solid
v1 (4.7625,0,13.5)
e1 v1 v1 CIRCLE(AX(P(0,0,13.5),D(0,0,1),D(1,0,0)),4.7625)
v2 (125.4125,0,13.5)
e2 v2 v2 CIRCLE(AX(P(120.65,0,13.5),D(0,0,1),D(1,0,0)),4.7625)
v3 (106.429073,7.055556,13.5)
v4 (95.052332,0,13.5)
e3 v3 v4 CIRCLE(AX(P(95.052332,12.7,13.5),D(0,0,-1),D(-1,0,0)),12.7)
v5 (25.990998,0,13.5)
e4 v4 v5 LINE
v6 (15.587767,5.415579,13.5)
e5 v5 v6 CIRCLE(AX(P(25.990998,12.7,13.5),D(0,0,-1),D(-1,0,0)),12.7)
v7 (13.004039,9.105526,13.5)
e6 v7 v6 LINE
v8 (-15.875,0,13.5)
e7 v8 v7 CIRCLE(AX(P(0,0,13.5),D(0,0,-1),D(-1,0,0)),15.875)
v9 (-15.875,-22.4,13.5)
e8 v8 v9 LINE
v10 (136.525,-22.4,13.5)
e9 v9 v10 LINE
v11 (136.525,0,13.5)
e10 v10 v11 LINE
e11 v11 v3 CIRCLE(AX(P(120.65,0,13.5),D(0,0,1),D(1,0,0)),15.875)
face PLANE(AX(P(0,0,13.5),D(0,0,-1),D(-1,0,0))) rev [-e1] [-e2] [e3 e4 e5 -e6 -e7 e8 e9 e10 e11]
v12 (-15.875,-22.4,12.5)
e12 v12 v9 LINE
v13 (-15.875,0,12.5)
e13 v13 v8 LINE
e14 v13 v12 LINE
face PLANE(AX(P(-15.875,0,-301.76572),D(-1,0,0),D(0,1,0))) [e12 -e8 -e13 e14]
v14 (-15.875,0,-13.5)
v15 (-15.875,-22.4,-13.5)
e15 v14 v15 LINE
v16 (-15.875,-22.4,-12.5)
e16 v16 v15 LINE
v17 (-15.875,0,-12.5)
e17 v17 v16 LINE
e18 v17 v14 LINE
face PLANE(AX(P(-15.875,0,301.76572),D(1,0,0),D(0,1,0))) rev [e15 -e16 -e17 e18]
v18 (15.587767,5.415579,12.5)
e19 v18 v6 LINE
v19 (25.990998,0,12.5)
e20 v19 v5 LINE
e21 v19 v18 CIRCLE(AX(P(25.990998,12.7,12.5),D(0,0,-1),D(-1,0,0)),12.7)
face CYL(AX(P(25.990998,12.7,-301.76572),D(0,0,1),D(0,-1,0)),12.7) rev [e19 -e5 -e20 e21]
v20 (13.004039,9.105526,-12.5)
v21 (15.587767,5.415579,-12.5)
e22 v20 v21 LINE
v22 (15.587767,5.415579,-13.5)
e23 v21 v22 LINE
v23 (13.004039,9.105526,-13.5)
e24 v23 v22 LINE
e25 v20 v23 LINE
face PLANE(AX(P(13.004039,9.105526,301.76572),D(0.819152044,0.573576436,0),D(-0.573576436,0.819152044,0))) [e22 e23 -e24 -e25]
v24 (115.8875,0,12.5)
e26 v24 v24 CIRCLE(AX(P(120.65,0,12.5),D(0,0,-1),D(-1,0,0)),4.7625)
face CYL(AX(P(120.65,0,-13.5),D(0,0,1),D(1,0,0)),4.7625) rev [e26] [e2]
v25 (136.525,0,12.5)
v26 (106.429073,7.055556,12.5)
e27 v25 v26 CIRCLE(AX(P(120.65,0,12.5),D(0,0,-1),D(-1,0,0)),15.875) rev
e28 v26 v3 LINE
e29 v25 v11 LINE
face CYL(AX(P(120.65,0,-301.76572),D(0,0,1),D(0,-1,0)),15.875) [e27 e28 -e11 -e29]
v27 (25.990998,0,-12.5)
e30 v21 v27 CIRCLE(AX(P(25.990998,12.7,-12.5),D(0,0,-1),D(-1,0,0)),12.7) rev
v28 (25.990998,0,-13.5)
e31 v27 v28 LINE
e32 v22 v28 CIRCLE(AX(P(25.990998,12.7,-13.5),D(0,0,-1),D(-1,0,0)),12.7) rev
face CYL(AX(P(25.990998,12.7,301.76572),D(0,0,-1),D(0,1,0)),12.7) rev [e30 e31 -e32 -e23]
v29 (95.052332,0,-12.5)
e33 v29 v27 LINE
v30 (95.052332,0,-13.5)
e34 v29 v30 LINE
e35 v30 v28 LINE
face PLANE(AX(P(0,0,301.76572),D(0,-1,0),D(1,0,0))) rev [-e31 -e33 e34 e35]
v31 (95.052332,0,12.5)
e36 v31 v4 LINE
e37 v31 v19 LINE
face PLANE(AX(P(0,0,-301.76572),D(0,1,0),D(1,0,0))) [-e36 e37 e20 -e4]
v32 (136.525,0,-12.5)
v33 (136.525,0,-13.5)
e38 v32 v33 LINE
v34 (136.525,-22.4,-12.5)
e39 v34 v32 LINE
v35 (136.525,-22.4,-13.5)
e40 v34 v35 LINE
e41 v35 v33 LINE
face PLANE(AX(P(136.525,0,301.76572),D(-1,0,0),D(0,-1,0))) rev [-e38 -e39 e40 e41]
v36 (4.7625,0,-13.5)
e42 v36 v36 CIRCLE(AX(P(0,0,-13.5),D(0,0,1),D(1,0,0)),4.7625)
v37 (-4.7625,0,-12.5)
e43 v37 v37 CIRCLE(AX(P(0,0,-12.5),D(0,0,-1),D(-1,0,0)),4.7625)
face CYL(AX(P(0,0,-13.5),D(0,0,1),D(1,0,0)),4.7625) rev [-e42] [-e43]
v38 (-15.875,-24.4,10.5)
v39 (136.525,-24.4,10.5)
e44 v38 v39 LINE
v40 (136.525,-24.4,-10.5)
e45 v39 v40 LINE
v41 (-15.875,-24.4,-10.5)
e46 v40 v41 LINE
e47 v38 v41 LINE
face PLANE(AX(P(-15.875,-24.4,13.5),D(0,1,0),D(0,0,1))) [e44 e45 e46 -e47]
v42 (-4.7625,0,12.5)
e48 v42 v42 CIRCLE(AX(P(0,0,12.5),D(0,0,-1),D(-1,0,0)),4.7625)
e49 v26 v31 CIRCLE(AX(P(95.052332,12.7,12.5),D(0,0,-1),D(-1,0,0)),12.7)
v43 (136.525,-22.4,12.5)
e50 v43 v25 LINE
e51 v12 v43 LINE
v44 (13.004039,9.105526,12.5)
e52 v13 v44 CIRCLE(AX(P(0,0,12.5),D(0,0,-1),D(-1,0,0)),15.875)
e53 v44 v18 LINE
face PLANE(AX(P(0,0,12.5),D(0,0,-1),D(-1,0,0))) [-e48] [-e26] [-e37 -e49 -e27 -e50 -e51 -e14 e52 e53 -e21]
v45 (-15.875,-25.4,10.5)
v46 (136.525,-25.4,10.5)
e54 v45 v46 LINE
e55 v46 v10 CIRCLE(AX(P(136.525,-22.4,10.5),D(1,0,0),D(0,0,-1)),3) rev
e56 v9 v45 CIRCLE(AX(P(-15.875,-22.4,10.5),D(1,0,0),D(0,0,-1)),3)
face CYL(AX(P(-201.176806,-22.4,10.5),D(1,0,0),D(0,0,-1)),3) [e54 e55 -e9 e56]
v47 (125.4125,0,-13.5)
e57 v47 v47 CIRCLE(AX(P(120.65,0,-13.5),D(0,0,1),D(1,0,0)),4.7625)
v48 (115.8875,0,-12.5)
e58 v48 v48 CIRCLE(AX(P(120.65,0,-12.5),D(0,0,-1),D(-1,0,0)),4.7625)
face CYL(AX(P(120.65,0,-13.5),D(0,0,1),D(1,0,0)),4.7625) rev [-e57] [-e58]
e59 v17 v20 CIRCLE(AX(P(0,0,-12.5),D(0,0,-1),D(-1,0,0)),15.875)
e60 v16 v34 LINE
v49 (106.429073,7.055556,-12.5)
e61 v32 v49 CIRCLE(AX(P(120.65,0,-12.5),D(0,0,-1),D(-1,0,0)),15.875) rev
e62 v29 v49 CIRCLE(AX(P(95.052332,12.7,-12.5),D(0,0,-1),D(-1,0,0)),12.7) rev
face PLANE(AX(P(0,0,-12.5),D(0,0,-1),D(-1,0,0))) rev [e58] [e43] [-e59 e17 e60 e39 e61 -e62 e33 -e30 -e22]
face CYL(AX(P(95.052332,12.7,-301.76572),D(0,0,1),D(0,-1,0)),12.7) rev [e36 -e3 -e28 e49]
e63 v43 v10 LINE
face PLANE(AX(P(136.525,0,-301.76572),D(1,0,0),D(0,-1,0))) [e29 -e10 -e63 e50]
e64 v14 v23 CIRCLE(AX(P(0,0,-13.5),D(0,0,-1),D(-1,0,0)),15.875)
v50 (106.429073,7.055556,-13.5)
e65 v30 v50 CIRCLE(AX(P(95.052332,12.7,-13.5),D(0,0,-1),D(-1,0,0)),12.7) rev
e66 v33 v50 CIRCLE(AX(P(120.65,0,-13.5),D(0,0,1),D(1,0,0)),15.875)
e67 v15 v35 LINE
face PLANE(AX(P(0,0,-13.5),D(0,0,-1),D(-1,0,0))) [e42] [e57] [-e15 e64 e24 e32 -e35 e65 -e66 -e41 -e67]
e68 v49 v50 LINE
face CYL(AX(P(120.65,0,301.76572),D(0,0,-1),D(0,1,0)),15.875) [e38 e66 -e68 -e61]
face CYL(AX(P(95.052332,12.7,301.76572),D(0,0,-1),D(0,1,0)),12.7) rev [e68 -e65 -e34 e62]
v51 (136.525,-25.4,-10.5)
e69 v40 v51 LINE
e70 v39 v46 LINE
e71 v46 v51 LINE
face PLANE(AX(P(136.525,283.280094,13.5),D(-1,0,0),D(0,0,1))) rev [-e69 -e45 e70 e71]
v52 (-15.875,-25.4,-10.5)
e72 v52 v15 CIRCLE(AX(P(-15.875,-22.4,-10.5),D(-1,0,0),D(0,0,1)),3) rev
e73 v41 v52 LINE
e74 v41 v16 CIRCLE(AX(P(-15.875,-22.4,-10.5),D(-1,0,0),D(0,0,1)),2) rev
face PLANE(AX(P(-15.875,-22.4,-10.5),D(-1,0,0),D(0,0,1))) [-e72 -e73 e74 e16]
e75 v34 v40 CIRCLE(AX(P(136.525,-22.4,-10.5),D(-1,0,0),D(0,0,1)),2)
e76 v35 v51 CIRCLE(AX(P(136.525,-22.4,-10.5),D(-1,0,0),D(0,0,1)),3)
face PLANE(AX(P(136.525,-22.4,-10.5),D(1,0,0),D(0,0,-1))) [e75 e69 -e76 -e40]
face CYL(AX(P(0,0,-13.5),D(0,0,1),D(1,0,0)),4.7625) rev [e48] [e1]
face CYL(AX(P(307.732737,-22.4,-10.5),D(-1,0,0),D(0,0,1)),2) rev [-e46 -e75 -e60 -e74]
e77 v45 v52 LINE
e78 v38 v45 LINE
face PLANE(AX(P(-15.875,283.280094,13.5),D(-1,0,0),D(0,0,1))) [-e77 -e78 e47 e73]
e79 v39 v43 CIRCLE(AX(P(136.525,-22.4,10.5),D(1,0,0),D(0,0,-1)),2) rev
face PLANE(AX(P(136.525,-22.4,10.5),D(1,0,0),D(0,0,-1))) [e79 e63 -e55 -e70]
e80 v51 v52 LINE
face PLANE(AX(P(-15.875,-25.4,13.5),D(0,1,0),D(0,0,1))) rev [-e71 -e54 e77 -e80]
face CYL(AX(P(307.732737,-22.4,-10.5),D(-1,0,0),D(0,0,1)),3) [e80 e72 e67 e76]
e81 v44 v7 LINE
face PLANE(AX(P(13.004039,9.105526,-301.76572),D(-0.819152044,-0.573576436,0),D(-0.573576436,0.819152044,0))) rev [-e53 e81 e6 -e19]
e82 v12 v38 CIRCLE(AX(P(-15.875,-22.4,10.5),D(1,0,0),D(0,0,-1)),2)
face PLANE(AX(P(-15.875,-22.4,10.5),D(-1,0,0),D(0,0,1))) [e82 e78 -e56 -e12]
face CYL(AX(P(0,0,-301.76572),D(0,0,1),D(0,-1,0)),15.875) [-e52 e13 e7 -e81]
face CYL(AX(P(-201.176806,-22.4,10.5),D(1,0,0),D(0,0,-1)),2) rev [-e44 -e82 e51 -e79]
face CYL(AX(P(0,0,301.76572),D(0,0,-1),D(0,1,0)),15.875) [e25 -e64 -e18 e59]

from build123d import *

# Parameters (mm, degrees)
BASE_EXTRUDE_DEPTH         = 13.5
FILLET1_R                  = 12.7
SHELL1_T                   = -1
SKETCH2_R                  = 4.7625
CUT_EXTRUDE1_DEPTH         = 142.468143499
FLATTEN_BENDS1_START       = -24.4
FLATTEN_BENDS1_OUTLINE_W   = 152.4
FLATTEN_BENDS1_OUTLINE_H   = 1
FLATTEN_BENDS1_DEPTH       = 41.4
FLATTEN_BENDS1_START_2     = -25.4
FLATTEN_BENDS1_2_OUTLINE_R = 4.7625
FLATTEN_BENDS1_2_DEPTH     = 1
PROCESS_BENDS1_START       = -54
PROCESS_BENDS1_OUTLINE_W   = 152.4
PROCESS_BENDS1_OUTLINE_H   = 1
PROCESS_BENDS1_DEPTH       = 40.80822
PROCESS_BENDS1_START_2     = 13.19178
PROCESS_BENDS1_2_OUTLINE_W = 152.4
PROCESS_BENDS1_2_OUTLINE_H = 1
PROCESS_BENDS1_2_DEPTH     = 40.80822
PROCESS_BENDS1_START_3     = -13.5
PROCESS_BENDS1_3_OUTLINE_R = 4.7625
PROCESS_BENDS1_3_DEPTH     = 3
PROCESS_BENDS1_START_4     = 10.5
PROCESS_BENDS1_4_OUTLINE_R = 4.7625
PROCESS_BENDS1_4_DEPTH     = 3
PROCESS_BENDS1_START_5     = -15.875
PROCESS_BENDS1_5_DEPTH     = 152.4


with BuildPart() as part:
    # Sketch1 → Base-Extrude (new, symmetric)
    with BuildSketch(Plane.XY):
        with BuildLine():
            Line((-15.875, 0), (-15.875, -25.4))
            Line((-15.875, -25.4), (136.525, -25.4))
            Line((136.525, -25.4), (136.525, 0))
            ThreePointArc((136.525, 0), (123.40666482, 15.633823079), (105.732379645, 5.429569775))
            Line((105.732379645, 5.429569775), (103.756177862, 0))
            Line((103.756177862, 0), (19.379796597, 0))
            Line((19.379796597, 0), (13.004038703, 9.105525927))
            ThreePointArc((13.004038703, 9.105525927), (-4.773704567, 15.140256593), (-15.875, 0))
        make_face()
    extrude(amount=BASE_EXTRUDE_DEPTH, both=True)

    # Fillet1
    # the kernel refuses this fillet: 12.7 mm, written as the material it adds along each edge
    with BuildSketch(Plane(origin=(103.756177862, 0, -13.5), x_dir=(-1, 0, 0), z_dir=(0, 0, 1))) as fillet1_piece_1:
        with BuildLine():
            CenterArc((8.703846213, -12.7), FILLET1_R, 90, 63.612200039)
            Line((-2.672895276, -7.055555556), (-3.810569425, -6.491111111))
            ThreePointArc((-3.810569425, -6.491111111), (-3.169611411, -4.995204193), (-1.193409628, 0.434365582))
            Line((-1.193409628, 0.434365582), (0, 1.27))
            Line((0, 1.27), (8.703846213, 1.27))
            Line((8.703846213, 1.27), (8.703846213, 0))
        make_face()
    extrude(amount=27)
    with BuildSketch(Plane(origin=(19.379796597, 0, 13.5), x_dir=(-0.5735764363510504, 0.8191520442889888, 0), z_dir=(0, 0, -1))) as fillet1_piece_2:
        with BuildLine():
            CenterArc((FILLET1_R * 0.520567050552, FILLET1_R), FILLET1_R, 215, 55)
            Line((-FILLET1_R * 0.298584993737, FILLET1_R * 0.426423563649), (0, 0))
            Line((0, 0), (FILLET1_R * 0.520567050552, 0))
        make_face()
    extrude(amount=27)

    # Shell1
    shell1_openings = [part.faces().sort_by_distance(p)[0] for p in [
        (-15.875, -12.7, 0),
        (136.525, -12.7, 0),
        (124.273424559, 15.45595094, 0),
        (60.521664894, 0, 0),
        (14.29590294, 7.260552593, 0),
        (-4.773704567, 15.140256593, 0),
        (20.126790751, 1.434962419, 0),
        (101.745819363, 1.907075363, 0),
    ]]
    offset(amount=SHELL1_T, openings=shell1_openings, kind=Kind.INTERSECTION)

    # Sketch2 → Cut-Extrude1 (cut, through all)
    with BuildSketch(Plane.XY.offset(13.5)):
        with Locations((120.65, 0)):
            Circle(SKETCH2_R)
        Circle(SKETCH2_R)
    extrude(amount=-CUT_EXTRUDE1_DEPTH, mode=Mode.SUBTRACT)

    # Flatten-Bends1: read off the stored shape, not the designer's step
    # Flatten-Bends1 outline → Flatten-Bends1 (cut)
    with BuildSketch(Plane(origin=(0, 0, 0), x_dir=(1, 0, 0), z_dir=(0, 1, 0)).offset(FLATTEN_BENDS1_START)):
        with Locations((60.325, 13)):
            Rectangle(FLATTEN_BENDS1_OUTLINE_W, FLATTEN_BENDS1_OUTLINE_H)
        with Locations((60.325, -13)):
            Rectangle(FLATTEN_BENDS1_OUTLINE_W, FLATTEN_BENDS1_OUTLINE_H)
    extrude(amount=FLATTEN_BENDS1_DEPTH, mode=Mode.SUBTRACT)

    # Flatten-Bends1 2 outline → Flatten-Bends1 2 (add)
    # profile 1 of 2: a face of its own
    with BuildSketch(Plane(origin=(0, 0, 0), x_dir=(1, 0, 0), z_dir=(0, 1, 0)).offset(FLATTEN_BENDS1_START_2)):
        with BuildLine():
            ThreePointArc((106.429073138, -43.882546373), (124.273424559, -52.282941757), (136.525, -36.826990817))
            Line((136.525, -36.826990817), (136.525, -13.5))
            Line((136.525, -13.5), (-15.875, -13.5))
            Line((-15.875, -13.5), (-15.875, -36.826990817))
            ThreePointArc((-15.875, -36.826990817), (-4.773704567, -51.96724741), (13.004038703, -45.932516744))
            Line((13.004038703, -45.932516744), (15.587767176, -42.242570075))
            ThreePointArc((15.587767176, -42.242570075), (20.126790751, -38.261953236), (25.990998139, -36.826990817))
            Line((25.990998139, -36.826990817), (95.052331649, -36.826990817))
            ThreePointArc((95.052331649, -36.826990817), (101.745819363, -38.73406618), (106.429073138, -43.882546373))
        make_face()
        with Locations((0, -36.826990817)):
            Circle(FLATTEN_BENDS1_2_OUTLINE_R, mode=Mode.SUBTRACT)
        with Locations((120.65, -36.826990817)):
            Circle(FLATTEN_BENDS1_2_OUTLINE_R, mode=Mode.SUBTRACT)
    # profile 2 of 2: a face of its own
    with BuildSketch(Plane(origin=(0, 0, 0), x_dir=(1, 0, 0), z_dir=(0, 1, 0)).offset(FLATTEN_BENDS1_START_2)):
        with BuildLine():
            Line((-15.875, 36.826990817), (-15.875, 13.5))
            Line((-15.875, 13.5), (136.525, 13.5))
            Line((136.525, 13.5), (136.525, 36.826990817))
            ThreePointArc((136.525, 36.826990817), (124.273424559, 52.282941757), (106.429073138, 43.882546373))
            ThreePointArc((106.429073138, 43.882546373), (101.745819363, 38.73406618), (95.052331649, 36.826990817))
            Line((95.052331649, 36.826990817), (25.990998139, 36.826990817))
            ThreePointArc((25.990998139, 36.826990817), (20.126790751, 38.261953236), (15.587767176, 42.242570075))
            Line((15.587767176, 42.242570075), (13.004038703, 45.932516744))
            ThreePointArc((13.004038703, 45.932516744), (-4.773704567, 51.96724741), (-15.875, 36.826990817))
        make_face()
        with Locations((0, 36.826990817)):
            Circle(FLATTEN_BENDS1_2_OUTLINE_R, mode=Mode.SUBTRACT)
        with Locations((120.65, 36.826990817)):
            Circle(FLATTEN_BENDS1_2_OUTLINE_R, mode=Mode.SUBTRACT)
    extrude(amount=FLATTEN_BENDS1_2_DEPTH)

    # Process-Bends1: read off the stored shape, not the designer's step
    # Process-Bends1 outline → Process-Bends1 (cut)
    with BuildSketch(Plane.XY.offset(PROCESS_BENDS1_START)):
        with Locations((60.325, -24.9)):
            Rectangle(PROCESS_BENDS1_OUTLINE_W, PROCESS_BENDS1_OUTLINE_H)
    extrude(amount=PROCESS_BENDS1_DEPTH, mode=Mode.SUBTRACT)

    # Process-Bends1 2 outline → Process-Bends1 2 (cut)
    with BuildSketch(Plane.XY.offset(PROCESS_BENDS1_START_2)):
        with Locations((60.325, -24.9)):
            Rectangle(PROCESS_BENDS1_2_OUTLINE_W, PROCESS_BENDS1_2_OUTLINE_H)
    extrude(amount=PROCESS_BENDS1_2_DEPTH, mode=Mode.SUBTRACT)

    # Process-Bends1 3 outline → Process-Bends1 3 (add)
    with BuildSketch(Plane.XY.offset(PROCESS_BENDS1_START_3)):
        with BuildLine():
            Line((136.525, -24.4), (136.525, 0))
            ThreePointArc((136.525, 0), (124.273424559, 15.45595094), (106.429073138, 7.055555556))
            ThreePointArc((106.429073138, 7.055555556), (101.745819363, 1.907075363), (95.052331649, 0))
            Line((95.052331649, 0), (25.990998139, 0))
            ThreePointArc((25.990998139, 0), (20.126790751, 1.434962419), (15.587767176, 5.415579258))
            Line((15.587767176, 5.415579258), (13.004038703, 9.105525927))
            ThreePointArc((13.004038703, 9.105525927), (-4.773704567, 15.140256593), (-15.875, 0))
            Line((-15.875, 0), (-15.875, -24.4))
            Line((-15.875, -24.4), (136.525, -24.4))
        make_face()
        Circle(PROCESS_BENDS1_3_OUTLINE_R, mode=Mode.SUBTRACT)
        with Locations((120.65, 0)):
            Circle(PROCESS_BENDS1_3_OUTLINE_R, mode=Mode.SUBTRACT)
    extrude(amount=PROCESS_BENDS1_3_DEPTH)

    # Process-Bends1 4 outline → Process-Bends1 4 (add)
    with BuildSketch(Plane.XY.offset(PROCESS_BENDS1_START_4)):
        with BuildLine():
            Line((136.525, -24.4), (136.525, 0))
            ThreePointArc((136.525, 0), (124.273424559, 15.45595094), (106.429073138, 7.055555556))
            ThreePointArc((106.429073138, 7.055555556), (101.745819363, 1.907075363), (95.052331649, 0))
            Line((95.052331649, 0), (25.990998139, 0))
            ThreePointArc((25.990998139, 0), (20.126790751, 1.434962419), (15.587767176, 5.415579258))
            Line((15.587767176, 5.415579258), (13.004038703, 9.105525927))
            ThreePointArc((13.004038703, 9.105525927), (-4.773704567, 15.140256593), (-15.875, 0))
            Line((-15.875, 0), (-15.875, -24.4))
            Line((-15.875, -24.4), (136.525, -24.4))
        make_face()
        Circle(PROCESS_BENDS1_4_OUTLINE_R, mode=Mode.SUBTRACT)
        with Locations((120.65, 0)):
            Circle(PROCESS_BENDS1_4_OUTLINE_R, mode=Mode.SUBTRACT)
    extrude(amount=PROCESS_BENDS1_4_DEPTH)

    # Process-Bends1 5 outline → Process-Bends1 5 (cut)
    with BuildSketch(Plane.YZ.offset(PROCESS_BENDS1_START_5)):
        with BuildLine():
            ThreePointArc((-24.4, -10.5), (-23.814213562, -11.914213562), (-22.4, -12.5))
            Line((-22.4, -12.5), (17, -12.5))
            Line((17, -12.5), (17, -10.5))
            Line((17, -10.5), (-24.4, -10.5))
        make_face()
        with BuildLine():
            Line((0, -15), (0, -13.5))
            Line((0, -13.5), (-22.4, -13.5))
            ThreePointArc((-22.4, -13.5), (-24.521320344, -12.621320344), (-25.4, -10.5))
            Line((-25.4, -10.5), (-25.4, -13.19178))
            Line((-25.4, -13.19178), (-24.4, -13.19178))
            Line((-24.4, -13.19178), (-24.4, -15))
            Line((-24.4, -15), (0, -15))
        make_face()
        with BuildLine():
            ThreePointArc((-22.4, 12.5), (-23.814213562, 11.914213562), (-24.4, 10.5))
            Line((-24.4, 10.5), (17, 10.5))
            Line((17, 10.5), (17, 12.5))
            Line((17, 12.5), (-22.4, 12.5))
        make_face()
        with BuildLine():
            Line((-22.4, 13.5), (0, 13.499999989))
            Line((0, 13.499999989), (0, 15))
            Line((0, 15), (-24.4, 15))
            Line((-24.4, 15), (-24.4, 13.19178))
            Line((-24.4, 13.19178), (-25.4, 13.19178))
            Line((-25.4, 13.19178), (-25.4, 10.5))
            ThreePointArc((-25.4, 10.5), (-24.521320344, 12.621320344), (-22.4, 13.5))
        make_face()
    extrude(amount=PROCESS_BENDS1_5_DEPTH, mode=Mode.SUBTRACT)


solid = part.part
